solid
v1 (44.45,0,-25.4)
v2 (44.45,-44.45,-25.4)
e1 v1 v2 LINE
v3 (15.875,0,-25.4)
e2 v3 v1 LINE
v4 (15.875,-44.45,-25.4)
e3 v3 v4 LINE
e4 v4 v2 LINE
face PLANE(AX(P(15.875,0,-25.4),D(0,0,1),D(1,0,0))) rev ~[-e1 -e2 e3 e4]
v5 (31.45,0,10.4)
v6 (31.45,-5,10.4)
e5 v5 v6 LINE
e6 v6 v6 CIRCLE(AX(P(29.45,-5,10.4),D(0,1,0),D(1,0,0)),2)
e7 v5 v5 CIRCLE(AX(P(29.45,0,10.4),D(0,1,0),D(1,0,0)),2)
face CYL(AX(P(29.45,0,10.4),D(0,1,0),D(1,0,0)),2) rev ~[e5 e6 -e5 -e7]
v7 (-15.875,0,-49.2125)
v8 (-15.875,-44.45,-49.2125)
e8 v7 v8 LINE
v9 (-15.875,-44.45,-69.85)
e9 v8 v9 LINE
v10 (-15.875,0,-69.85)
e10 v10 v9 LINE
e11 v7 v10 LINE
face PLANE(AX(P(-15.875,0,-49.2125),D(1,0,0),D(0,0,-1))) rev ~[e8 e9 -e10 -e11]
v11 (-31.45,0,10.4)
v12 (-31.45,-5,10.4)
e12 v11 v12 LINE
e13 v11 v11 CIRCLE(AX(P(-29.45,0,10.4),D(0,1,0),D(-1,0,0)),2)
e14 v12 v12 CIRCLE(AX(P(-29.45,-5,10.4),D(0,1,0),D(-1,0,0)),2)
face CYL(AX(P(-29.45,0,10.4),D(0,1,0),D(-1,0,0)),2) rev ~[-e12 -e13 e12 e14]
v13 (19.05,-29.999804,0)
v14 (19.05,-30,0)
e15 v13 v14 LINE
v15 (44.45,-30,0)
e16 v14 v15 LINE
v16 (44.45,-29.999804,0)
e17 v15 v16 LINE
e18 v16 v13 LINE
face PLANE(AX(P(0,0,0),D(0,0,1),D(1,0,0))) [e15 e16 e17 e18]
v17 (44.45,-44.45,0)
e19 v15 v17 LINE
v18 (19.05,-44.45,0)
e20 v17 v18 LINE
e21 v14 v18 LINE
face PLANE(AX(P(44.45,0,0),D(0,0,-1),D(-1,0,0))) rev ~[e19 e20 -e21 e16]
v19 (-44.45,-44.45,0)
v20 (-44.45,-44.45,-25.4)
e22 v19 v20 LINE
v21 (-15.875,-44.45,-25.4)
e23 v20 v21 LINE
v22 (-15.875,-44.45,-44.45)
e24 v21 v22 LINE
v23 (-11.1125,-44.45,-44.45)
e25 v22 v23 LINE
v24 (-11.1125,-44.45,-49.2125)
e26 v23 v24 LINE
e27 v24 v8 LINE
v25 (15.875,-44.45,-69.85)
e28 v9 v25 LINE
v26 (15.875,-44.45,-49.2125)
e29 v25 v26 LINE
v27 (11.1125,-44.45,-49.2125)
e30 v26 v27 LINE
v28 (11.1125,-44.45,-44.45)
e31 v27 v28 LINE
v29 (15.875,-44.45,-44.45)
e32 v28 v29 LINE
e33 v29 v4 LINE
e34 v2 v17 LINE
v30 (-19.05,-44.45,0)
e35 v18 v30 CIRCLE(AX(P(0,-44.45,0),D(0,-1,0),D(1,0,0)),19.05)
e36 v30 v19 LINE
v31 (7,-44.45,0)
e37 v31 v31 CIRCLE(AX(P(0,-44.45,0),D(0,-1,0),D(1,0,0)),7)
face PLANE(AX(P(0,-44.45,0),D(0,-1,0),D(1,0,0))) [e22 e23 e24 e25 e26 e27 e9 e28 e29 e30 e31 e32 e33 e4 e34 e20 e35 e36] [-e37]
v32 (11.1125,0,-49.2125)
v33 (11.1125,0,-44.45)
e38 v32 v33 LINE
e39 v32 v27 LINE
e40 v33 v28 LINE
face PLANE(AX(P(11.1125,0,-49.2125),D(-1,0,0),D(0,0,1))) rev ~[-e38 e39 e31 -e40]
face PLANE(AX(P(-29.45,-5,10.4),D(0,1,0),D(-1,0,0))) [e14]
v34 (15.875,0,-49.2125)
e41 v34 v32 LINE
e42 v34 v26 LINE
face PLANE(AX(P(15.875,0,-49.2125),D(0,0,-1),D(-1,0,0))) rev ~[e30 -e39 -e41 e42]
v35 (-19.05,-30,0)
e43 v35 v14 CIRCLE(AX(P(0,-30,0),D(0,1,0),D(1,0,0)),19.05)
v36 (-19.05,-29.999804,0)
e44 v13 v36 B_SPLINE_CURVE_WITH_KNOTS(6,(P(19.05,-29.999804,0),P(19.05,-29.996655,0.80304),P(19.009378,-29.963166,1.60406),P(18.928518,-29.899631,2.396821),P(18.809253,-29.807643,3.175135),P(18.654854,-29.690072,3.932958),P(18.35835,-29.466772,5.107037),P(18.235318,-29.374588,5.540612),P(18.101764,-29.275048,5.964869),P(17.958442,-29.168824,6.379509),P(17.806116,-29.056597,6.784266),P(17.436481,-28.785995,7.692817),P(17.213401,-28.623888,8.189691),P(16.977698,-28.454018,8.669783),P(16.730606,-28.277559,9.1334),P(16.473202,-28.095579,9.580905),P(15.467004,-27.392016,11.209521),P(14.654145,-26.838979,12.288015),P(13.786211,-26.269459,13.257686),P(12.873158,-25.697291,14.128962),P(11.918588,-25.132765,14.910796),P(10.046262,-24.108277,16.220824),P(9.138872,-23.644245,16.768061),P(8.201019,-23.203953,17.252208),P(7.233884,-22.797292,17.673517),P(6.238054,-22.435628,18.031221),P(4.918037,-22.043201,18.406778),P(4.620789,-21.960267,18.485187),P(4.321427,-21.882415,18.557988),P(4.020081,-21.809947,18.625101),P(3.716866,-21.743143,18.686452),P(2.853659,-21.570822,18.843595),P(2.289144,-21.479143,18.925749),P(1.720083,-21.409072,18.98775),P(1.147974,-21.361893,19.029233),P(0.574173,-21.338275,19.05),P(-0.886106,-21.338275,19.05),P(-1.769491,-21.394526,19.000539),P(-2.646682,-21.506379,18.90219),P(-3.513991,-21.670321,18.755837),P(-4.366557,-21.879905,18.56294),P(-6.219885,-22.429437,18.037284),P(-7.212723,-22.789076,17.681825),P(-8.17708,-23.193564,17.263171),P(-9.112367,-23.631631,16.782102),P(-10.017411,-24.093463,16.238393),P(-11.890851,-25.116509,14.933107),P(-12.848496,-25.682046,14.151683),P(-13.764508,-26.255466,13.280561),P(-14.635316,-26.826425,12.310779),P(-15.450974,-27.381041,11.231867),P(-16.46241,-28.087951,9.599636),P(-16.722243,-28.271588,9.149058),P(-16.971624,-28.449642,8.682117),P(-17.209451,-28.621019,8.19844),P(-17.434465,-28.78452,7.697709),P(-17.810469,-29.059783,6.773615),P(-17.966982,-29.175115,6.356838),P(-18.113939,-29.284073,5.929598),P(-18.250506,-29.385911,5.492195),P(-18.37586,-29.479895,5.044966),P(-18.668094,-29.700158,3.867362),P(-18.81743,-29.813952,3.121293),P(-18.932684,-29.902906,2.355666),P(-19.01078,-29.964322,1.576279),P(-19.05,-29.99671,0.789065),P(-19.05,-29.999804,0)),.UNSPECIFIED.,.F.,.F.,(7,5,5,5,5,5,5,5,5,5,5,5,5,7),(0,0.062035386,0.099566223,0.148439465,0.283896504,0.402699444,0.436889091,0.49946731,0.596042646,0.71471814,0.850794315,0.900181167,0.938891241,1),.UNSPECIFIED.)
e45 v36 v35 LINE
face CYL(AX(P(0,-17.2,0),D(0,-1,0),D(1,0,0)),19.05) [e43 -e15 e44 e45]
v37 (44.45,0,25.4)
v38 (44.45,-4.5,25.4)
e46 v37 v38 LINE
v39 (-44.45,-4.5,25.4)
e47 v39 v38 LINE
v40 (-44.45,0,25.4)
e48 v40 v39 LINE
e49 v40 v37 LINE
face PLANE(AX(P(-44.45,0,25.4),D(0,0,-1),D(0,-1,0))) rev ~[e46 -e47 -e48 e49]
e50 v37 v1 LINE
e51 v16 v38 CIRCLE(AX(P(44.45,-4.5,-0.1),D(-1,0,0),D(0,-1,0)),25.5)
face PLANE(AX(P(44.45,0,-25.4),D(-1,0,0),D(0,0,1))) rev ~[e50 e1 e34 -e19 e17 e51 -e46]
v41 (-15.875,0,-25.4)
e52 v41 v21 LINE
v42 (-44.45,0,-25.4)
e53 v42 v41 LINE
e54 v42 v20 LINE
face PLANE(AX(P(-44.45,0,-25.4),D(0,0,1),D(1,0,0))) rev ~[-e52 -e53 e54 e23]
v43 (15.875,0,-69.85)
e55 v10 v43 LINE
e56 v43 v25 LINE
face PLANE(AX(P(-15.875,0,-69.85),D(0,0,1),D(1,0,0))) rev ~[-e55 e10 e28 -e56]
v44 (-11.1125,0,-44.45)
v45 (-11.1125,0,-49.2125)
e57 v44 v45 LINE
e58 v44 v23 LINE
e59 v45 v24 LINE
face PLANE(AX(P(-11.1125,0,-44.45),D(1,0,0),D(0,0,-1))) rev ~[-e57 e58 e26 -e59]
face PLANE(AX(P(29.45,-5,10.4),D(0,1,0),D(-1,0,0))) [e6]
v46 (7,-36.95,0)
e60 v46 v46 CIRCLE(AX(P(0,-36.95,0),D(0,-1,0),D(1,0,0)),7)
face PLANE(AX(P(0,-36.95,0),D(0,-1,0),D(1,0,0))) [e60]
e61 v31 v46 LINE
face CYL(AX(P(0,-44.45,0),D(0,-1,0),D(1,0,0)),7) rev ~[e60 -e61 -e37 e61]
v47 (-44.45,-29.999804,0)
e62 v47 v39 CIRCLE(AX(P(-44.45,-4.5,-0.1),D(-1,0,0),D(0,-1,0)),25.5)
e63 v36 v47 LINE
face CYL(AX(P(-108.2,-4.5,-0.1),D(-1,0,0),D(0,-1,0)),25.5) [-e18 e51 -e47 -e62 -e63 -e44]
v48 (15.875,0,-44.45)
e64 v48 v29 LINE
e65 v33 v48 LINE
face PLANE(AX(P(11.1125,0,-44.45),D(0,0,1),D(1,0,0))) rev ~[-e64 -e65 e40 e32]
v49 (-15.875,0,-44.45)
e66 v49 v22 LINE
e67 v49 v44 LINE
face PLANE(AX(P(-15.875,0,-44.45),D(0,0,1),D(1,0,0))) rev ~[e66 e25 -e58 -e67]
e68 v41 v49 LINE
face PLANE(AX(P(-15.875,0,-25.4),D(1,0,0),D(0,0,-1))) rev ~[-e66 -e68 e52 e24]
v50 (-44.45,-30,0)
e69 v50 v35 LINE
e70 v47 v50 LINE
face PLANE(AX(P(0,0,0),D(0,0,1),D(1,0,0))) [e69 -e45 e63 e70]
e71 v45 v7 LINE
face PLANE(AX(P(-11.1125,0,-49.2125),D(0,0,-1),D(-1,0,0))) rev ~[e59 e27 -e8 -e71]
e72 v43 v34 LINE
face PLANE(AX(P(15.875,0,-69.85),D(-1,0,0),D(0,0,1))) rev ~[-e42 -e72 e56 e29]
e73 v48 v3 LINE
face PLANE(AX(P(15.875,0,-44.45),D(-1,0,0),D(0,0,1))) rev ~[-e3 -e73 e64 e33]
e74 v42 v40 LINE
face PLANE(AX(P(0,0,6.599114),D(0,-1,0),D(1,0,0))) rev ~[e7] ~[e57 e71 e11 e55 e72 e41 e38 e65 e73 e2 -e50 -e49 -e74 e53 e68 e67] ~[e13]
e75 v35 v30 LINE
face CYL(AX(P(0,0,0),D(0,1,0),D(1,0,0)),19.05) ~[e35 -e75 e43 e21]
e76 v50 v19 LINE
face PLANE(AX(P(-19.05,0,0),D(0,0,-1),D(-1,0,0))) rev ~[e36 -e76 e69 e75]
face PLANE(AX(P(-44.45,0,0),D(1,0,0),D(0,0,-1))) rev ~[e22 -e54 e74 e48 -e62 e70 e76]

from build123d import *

# Parameters (mm, degrees)
F1_DEPTH    = 44.45
F2_W        = 30
F2_H        = 25.4
F3_DEPTH    = 88.9
F4_T4_DEPTH = 216.4
F4_S6_R     = 19.05
F4_T7_DEPTH = 111
F5_R        = 9.525
F6_DEPTH    = 12.7
F7_R        = 2
F8_DEPTH    = 5
F9_R        = 9.525
F10_DEPTH   = 24.5
F11_R       = 7
F12_DEPTH   = 7.5


# Not quite as in the source:
# - a fillet or chamfer that OpenCascade refuses, or shapes differently, is made with other operations: its cross-section is extruded or revolved along the edge and cut away or added


with BuildPart() as f1:
    # F0 (on Front) → F1 (new body)
    with BuildSketch(Plane.XZ):
        with BuildLine():
            Line((0, 0), (19.05, 0))
            ThreePointArc((19.05, 0), (0, 19.05), (-19.05, 0))
            Line((-19.05, 0), (0, 0))
        make_face()
        with BuildLine():
            Line((44.45, 0), (19.05, 0))
            ThreePointArc((19.05, 0), (0, -19.05), (-19.05, 0))
            Line((-19.05, 0), (-44.45, 0))
            Line((-44.45, 0), (-44.45, -25.4))
            Line((-44.45, -25.4), (-15.875, -25.4))
            Line((-15.875, -25.4), (-15.875, -44.45))
            Line((-15.875, -44.45), (-11.1125, -44.45))
            Line((-11.1125, -44.45), (-11.1125, -49.2125))
            Line((-11.1125, -49.2125), (-15.875, -49.2125))
            Line((-15.875, -49.2125), (-15.875, -69.85))
            Line((-15.875, -69.85), (15.875, -69.85))
            Line((15.875, -69.85), (15.875, -49.2125))
            Line((15.875, -49.2125), (11.1125, -49.2125))
            Line((11.1125, -49.2125), (11.1125, -44.45))
            Line((11.1125, -44.45), (15.875, -44.45))
            Line((15.875, -44.45), (15.875, -25.4))
            Line((15.875, -25.4), (44.45, -25.4))
            Line((44.45, -25.4), (44.45, 0))
        make_face()
        with BuildLine():
            ThreePointArc((-19.05, 0), (0, -19.05), (19.05, 0))
            Line((19.05, 0), (0, 0))
            Line((0, 0), (-19.05, 0))
        make_face()
    extrude(amount=F1_DEPTH)

    # F2 (on face) → F3 (join)
    with BuildSketch(Plane(origin=(-44.45, 0, 0), x_dir=(0, -1, 0), z_dir=(-1, 0, 0))):
        with Locations((15, 12.7)):
            Rectangle(F2_W, F2_H)
    extrude(amount=-F3_DEPTH)

    # F4: fillet of radius 25.5 on 1 edges, made by hand


with BuildPart() as f4_tool2:
    # F4_s3 → F4_t4 (new body)
    with BuildSketch(Plane.YZ.offset(-108.2)):
        with BuildLine():
            ThreePointArc((-30, -0.1), (-22.5312229203, 17.9312229203), (-4.5, 25.4))
            Line((-4.5, 25.4), (-30, 25.4))
            Line((-30, 25.4), (-30, -0.1))
        make_face()
    extrude(amount=F4_T4_DEPTH)

    split(bisect_by=Plane.XY, keep=Keep.TOP)

    # F4_s6 → F4_t7 (cut, symmetric)
    with BuildSketch(Plane.XZ.offset(17.2)):
        Circle(F4_S6_R)
    extrude(amount=F4_T7_DEPTH, both=True, mode=Mode.SUBTRACT)


with BuildPart() as f1_1:
    add(f1.part)

    # F4_t1: cut F4_tool2
    add(f4_tool2.part, mode=Mode.SUBTRACT)

    # F5 (on face) → F6 (cut)
    with BuildSketch(Plane.XZ.offset(44.45)):
        Circle(F5_R)
    extrude(amount=-F6_DEPTH, mode=Mode.SUBTRACT)

    # F7 (on face) → F8 (cut)
    with BuildSketch(Plane(origin=(0, 0, 0), x_dir=(-1, 0, 0), z_dir=(0, 1, 0))):
        with BuildLine():
            ThreePointArc((-27.45, 10.4), (-29.45, 12.4), (-31.45, 10.4))
            ThreePointArc((-31.45, 10.4), (-29.45, 8.4), (-27.45, 10.4))
        make_face()
        with Locations((29.45, 10.4)):
            Circle(F7_R)
    extrude(amount=-F8_DEPTH, mode=Mode.SUBTRACT)

    # F9 (on face) → F10 (join)
    with BuildSketch(Plane.XZ.offset(44.45)):
        Circle(F9_R)
    extrude(amount=-F10_DEPTH)

    # F11 (on face) → F12 (cut)
    with BuildSketch(Plane.XZ.offset(44.45)):
        Circle(F11_R)
    extrude(amount=-F12_DEPTH, mode=Mode.SUBTRACT)


solid = f1_1.part
